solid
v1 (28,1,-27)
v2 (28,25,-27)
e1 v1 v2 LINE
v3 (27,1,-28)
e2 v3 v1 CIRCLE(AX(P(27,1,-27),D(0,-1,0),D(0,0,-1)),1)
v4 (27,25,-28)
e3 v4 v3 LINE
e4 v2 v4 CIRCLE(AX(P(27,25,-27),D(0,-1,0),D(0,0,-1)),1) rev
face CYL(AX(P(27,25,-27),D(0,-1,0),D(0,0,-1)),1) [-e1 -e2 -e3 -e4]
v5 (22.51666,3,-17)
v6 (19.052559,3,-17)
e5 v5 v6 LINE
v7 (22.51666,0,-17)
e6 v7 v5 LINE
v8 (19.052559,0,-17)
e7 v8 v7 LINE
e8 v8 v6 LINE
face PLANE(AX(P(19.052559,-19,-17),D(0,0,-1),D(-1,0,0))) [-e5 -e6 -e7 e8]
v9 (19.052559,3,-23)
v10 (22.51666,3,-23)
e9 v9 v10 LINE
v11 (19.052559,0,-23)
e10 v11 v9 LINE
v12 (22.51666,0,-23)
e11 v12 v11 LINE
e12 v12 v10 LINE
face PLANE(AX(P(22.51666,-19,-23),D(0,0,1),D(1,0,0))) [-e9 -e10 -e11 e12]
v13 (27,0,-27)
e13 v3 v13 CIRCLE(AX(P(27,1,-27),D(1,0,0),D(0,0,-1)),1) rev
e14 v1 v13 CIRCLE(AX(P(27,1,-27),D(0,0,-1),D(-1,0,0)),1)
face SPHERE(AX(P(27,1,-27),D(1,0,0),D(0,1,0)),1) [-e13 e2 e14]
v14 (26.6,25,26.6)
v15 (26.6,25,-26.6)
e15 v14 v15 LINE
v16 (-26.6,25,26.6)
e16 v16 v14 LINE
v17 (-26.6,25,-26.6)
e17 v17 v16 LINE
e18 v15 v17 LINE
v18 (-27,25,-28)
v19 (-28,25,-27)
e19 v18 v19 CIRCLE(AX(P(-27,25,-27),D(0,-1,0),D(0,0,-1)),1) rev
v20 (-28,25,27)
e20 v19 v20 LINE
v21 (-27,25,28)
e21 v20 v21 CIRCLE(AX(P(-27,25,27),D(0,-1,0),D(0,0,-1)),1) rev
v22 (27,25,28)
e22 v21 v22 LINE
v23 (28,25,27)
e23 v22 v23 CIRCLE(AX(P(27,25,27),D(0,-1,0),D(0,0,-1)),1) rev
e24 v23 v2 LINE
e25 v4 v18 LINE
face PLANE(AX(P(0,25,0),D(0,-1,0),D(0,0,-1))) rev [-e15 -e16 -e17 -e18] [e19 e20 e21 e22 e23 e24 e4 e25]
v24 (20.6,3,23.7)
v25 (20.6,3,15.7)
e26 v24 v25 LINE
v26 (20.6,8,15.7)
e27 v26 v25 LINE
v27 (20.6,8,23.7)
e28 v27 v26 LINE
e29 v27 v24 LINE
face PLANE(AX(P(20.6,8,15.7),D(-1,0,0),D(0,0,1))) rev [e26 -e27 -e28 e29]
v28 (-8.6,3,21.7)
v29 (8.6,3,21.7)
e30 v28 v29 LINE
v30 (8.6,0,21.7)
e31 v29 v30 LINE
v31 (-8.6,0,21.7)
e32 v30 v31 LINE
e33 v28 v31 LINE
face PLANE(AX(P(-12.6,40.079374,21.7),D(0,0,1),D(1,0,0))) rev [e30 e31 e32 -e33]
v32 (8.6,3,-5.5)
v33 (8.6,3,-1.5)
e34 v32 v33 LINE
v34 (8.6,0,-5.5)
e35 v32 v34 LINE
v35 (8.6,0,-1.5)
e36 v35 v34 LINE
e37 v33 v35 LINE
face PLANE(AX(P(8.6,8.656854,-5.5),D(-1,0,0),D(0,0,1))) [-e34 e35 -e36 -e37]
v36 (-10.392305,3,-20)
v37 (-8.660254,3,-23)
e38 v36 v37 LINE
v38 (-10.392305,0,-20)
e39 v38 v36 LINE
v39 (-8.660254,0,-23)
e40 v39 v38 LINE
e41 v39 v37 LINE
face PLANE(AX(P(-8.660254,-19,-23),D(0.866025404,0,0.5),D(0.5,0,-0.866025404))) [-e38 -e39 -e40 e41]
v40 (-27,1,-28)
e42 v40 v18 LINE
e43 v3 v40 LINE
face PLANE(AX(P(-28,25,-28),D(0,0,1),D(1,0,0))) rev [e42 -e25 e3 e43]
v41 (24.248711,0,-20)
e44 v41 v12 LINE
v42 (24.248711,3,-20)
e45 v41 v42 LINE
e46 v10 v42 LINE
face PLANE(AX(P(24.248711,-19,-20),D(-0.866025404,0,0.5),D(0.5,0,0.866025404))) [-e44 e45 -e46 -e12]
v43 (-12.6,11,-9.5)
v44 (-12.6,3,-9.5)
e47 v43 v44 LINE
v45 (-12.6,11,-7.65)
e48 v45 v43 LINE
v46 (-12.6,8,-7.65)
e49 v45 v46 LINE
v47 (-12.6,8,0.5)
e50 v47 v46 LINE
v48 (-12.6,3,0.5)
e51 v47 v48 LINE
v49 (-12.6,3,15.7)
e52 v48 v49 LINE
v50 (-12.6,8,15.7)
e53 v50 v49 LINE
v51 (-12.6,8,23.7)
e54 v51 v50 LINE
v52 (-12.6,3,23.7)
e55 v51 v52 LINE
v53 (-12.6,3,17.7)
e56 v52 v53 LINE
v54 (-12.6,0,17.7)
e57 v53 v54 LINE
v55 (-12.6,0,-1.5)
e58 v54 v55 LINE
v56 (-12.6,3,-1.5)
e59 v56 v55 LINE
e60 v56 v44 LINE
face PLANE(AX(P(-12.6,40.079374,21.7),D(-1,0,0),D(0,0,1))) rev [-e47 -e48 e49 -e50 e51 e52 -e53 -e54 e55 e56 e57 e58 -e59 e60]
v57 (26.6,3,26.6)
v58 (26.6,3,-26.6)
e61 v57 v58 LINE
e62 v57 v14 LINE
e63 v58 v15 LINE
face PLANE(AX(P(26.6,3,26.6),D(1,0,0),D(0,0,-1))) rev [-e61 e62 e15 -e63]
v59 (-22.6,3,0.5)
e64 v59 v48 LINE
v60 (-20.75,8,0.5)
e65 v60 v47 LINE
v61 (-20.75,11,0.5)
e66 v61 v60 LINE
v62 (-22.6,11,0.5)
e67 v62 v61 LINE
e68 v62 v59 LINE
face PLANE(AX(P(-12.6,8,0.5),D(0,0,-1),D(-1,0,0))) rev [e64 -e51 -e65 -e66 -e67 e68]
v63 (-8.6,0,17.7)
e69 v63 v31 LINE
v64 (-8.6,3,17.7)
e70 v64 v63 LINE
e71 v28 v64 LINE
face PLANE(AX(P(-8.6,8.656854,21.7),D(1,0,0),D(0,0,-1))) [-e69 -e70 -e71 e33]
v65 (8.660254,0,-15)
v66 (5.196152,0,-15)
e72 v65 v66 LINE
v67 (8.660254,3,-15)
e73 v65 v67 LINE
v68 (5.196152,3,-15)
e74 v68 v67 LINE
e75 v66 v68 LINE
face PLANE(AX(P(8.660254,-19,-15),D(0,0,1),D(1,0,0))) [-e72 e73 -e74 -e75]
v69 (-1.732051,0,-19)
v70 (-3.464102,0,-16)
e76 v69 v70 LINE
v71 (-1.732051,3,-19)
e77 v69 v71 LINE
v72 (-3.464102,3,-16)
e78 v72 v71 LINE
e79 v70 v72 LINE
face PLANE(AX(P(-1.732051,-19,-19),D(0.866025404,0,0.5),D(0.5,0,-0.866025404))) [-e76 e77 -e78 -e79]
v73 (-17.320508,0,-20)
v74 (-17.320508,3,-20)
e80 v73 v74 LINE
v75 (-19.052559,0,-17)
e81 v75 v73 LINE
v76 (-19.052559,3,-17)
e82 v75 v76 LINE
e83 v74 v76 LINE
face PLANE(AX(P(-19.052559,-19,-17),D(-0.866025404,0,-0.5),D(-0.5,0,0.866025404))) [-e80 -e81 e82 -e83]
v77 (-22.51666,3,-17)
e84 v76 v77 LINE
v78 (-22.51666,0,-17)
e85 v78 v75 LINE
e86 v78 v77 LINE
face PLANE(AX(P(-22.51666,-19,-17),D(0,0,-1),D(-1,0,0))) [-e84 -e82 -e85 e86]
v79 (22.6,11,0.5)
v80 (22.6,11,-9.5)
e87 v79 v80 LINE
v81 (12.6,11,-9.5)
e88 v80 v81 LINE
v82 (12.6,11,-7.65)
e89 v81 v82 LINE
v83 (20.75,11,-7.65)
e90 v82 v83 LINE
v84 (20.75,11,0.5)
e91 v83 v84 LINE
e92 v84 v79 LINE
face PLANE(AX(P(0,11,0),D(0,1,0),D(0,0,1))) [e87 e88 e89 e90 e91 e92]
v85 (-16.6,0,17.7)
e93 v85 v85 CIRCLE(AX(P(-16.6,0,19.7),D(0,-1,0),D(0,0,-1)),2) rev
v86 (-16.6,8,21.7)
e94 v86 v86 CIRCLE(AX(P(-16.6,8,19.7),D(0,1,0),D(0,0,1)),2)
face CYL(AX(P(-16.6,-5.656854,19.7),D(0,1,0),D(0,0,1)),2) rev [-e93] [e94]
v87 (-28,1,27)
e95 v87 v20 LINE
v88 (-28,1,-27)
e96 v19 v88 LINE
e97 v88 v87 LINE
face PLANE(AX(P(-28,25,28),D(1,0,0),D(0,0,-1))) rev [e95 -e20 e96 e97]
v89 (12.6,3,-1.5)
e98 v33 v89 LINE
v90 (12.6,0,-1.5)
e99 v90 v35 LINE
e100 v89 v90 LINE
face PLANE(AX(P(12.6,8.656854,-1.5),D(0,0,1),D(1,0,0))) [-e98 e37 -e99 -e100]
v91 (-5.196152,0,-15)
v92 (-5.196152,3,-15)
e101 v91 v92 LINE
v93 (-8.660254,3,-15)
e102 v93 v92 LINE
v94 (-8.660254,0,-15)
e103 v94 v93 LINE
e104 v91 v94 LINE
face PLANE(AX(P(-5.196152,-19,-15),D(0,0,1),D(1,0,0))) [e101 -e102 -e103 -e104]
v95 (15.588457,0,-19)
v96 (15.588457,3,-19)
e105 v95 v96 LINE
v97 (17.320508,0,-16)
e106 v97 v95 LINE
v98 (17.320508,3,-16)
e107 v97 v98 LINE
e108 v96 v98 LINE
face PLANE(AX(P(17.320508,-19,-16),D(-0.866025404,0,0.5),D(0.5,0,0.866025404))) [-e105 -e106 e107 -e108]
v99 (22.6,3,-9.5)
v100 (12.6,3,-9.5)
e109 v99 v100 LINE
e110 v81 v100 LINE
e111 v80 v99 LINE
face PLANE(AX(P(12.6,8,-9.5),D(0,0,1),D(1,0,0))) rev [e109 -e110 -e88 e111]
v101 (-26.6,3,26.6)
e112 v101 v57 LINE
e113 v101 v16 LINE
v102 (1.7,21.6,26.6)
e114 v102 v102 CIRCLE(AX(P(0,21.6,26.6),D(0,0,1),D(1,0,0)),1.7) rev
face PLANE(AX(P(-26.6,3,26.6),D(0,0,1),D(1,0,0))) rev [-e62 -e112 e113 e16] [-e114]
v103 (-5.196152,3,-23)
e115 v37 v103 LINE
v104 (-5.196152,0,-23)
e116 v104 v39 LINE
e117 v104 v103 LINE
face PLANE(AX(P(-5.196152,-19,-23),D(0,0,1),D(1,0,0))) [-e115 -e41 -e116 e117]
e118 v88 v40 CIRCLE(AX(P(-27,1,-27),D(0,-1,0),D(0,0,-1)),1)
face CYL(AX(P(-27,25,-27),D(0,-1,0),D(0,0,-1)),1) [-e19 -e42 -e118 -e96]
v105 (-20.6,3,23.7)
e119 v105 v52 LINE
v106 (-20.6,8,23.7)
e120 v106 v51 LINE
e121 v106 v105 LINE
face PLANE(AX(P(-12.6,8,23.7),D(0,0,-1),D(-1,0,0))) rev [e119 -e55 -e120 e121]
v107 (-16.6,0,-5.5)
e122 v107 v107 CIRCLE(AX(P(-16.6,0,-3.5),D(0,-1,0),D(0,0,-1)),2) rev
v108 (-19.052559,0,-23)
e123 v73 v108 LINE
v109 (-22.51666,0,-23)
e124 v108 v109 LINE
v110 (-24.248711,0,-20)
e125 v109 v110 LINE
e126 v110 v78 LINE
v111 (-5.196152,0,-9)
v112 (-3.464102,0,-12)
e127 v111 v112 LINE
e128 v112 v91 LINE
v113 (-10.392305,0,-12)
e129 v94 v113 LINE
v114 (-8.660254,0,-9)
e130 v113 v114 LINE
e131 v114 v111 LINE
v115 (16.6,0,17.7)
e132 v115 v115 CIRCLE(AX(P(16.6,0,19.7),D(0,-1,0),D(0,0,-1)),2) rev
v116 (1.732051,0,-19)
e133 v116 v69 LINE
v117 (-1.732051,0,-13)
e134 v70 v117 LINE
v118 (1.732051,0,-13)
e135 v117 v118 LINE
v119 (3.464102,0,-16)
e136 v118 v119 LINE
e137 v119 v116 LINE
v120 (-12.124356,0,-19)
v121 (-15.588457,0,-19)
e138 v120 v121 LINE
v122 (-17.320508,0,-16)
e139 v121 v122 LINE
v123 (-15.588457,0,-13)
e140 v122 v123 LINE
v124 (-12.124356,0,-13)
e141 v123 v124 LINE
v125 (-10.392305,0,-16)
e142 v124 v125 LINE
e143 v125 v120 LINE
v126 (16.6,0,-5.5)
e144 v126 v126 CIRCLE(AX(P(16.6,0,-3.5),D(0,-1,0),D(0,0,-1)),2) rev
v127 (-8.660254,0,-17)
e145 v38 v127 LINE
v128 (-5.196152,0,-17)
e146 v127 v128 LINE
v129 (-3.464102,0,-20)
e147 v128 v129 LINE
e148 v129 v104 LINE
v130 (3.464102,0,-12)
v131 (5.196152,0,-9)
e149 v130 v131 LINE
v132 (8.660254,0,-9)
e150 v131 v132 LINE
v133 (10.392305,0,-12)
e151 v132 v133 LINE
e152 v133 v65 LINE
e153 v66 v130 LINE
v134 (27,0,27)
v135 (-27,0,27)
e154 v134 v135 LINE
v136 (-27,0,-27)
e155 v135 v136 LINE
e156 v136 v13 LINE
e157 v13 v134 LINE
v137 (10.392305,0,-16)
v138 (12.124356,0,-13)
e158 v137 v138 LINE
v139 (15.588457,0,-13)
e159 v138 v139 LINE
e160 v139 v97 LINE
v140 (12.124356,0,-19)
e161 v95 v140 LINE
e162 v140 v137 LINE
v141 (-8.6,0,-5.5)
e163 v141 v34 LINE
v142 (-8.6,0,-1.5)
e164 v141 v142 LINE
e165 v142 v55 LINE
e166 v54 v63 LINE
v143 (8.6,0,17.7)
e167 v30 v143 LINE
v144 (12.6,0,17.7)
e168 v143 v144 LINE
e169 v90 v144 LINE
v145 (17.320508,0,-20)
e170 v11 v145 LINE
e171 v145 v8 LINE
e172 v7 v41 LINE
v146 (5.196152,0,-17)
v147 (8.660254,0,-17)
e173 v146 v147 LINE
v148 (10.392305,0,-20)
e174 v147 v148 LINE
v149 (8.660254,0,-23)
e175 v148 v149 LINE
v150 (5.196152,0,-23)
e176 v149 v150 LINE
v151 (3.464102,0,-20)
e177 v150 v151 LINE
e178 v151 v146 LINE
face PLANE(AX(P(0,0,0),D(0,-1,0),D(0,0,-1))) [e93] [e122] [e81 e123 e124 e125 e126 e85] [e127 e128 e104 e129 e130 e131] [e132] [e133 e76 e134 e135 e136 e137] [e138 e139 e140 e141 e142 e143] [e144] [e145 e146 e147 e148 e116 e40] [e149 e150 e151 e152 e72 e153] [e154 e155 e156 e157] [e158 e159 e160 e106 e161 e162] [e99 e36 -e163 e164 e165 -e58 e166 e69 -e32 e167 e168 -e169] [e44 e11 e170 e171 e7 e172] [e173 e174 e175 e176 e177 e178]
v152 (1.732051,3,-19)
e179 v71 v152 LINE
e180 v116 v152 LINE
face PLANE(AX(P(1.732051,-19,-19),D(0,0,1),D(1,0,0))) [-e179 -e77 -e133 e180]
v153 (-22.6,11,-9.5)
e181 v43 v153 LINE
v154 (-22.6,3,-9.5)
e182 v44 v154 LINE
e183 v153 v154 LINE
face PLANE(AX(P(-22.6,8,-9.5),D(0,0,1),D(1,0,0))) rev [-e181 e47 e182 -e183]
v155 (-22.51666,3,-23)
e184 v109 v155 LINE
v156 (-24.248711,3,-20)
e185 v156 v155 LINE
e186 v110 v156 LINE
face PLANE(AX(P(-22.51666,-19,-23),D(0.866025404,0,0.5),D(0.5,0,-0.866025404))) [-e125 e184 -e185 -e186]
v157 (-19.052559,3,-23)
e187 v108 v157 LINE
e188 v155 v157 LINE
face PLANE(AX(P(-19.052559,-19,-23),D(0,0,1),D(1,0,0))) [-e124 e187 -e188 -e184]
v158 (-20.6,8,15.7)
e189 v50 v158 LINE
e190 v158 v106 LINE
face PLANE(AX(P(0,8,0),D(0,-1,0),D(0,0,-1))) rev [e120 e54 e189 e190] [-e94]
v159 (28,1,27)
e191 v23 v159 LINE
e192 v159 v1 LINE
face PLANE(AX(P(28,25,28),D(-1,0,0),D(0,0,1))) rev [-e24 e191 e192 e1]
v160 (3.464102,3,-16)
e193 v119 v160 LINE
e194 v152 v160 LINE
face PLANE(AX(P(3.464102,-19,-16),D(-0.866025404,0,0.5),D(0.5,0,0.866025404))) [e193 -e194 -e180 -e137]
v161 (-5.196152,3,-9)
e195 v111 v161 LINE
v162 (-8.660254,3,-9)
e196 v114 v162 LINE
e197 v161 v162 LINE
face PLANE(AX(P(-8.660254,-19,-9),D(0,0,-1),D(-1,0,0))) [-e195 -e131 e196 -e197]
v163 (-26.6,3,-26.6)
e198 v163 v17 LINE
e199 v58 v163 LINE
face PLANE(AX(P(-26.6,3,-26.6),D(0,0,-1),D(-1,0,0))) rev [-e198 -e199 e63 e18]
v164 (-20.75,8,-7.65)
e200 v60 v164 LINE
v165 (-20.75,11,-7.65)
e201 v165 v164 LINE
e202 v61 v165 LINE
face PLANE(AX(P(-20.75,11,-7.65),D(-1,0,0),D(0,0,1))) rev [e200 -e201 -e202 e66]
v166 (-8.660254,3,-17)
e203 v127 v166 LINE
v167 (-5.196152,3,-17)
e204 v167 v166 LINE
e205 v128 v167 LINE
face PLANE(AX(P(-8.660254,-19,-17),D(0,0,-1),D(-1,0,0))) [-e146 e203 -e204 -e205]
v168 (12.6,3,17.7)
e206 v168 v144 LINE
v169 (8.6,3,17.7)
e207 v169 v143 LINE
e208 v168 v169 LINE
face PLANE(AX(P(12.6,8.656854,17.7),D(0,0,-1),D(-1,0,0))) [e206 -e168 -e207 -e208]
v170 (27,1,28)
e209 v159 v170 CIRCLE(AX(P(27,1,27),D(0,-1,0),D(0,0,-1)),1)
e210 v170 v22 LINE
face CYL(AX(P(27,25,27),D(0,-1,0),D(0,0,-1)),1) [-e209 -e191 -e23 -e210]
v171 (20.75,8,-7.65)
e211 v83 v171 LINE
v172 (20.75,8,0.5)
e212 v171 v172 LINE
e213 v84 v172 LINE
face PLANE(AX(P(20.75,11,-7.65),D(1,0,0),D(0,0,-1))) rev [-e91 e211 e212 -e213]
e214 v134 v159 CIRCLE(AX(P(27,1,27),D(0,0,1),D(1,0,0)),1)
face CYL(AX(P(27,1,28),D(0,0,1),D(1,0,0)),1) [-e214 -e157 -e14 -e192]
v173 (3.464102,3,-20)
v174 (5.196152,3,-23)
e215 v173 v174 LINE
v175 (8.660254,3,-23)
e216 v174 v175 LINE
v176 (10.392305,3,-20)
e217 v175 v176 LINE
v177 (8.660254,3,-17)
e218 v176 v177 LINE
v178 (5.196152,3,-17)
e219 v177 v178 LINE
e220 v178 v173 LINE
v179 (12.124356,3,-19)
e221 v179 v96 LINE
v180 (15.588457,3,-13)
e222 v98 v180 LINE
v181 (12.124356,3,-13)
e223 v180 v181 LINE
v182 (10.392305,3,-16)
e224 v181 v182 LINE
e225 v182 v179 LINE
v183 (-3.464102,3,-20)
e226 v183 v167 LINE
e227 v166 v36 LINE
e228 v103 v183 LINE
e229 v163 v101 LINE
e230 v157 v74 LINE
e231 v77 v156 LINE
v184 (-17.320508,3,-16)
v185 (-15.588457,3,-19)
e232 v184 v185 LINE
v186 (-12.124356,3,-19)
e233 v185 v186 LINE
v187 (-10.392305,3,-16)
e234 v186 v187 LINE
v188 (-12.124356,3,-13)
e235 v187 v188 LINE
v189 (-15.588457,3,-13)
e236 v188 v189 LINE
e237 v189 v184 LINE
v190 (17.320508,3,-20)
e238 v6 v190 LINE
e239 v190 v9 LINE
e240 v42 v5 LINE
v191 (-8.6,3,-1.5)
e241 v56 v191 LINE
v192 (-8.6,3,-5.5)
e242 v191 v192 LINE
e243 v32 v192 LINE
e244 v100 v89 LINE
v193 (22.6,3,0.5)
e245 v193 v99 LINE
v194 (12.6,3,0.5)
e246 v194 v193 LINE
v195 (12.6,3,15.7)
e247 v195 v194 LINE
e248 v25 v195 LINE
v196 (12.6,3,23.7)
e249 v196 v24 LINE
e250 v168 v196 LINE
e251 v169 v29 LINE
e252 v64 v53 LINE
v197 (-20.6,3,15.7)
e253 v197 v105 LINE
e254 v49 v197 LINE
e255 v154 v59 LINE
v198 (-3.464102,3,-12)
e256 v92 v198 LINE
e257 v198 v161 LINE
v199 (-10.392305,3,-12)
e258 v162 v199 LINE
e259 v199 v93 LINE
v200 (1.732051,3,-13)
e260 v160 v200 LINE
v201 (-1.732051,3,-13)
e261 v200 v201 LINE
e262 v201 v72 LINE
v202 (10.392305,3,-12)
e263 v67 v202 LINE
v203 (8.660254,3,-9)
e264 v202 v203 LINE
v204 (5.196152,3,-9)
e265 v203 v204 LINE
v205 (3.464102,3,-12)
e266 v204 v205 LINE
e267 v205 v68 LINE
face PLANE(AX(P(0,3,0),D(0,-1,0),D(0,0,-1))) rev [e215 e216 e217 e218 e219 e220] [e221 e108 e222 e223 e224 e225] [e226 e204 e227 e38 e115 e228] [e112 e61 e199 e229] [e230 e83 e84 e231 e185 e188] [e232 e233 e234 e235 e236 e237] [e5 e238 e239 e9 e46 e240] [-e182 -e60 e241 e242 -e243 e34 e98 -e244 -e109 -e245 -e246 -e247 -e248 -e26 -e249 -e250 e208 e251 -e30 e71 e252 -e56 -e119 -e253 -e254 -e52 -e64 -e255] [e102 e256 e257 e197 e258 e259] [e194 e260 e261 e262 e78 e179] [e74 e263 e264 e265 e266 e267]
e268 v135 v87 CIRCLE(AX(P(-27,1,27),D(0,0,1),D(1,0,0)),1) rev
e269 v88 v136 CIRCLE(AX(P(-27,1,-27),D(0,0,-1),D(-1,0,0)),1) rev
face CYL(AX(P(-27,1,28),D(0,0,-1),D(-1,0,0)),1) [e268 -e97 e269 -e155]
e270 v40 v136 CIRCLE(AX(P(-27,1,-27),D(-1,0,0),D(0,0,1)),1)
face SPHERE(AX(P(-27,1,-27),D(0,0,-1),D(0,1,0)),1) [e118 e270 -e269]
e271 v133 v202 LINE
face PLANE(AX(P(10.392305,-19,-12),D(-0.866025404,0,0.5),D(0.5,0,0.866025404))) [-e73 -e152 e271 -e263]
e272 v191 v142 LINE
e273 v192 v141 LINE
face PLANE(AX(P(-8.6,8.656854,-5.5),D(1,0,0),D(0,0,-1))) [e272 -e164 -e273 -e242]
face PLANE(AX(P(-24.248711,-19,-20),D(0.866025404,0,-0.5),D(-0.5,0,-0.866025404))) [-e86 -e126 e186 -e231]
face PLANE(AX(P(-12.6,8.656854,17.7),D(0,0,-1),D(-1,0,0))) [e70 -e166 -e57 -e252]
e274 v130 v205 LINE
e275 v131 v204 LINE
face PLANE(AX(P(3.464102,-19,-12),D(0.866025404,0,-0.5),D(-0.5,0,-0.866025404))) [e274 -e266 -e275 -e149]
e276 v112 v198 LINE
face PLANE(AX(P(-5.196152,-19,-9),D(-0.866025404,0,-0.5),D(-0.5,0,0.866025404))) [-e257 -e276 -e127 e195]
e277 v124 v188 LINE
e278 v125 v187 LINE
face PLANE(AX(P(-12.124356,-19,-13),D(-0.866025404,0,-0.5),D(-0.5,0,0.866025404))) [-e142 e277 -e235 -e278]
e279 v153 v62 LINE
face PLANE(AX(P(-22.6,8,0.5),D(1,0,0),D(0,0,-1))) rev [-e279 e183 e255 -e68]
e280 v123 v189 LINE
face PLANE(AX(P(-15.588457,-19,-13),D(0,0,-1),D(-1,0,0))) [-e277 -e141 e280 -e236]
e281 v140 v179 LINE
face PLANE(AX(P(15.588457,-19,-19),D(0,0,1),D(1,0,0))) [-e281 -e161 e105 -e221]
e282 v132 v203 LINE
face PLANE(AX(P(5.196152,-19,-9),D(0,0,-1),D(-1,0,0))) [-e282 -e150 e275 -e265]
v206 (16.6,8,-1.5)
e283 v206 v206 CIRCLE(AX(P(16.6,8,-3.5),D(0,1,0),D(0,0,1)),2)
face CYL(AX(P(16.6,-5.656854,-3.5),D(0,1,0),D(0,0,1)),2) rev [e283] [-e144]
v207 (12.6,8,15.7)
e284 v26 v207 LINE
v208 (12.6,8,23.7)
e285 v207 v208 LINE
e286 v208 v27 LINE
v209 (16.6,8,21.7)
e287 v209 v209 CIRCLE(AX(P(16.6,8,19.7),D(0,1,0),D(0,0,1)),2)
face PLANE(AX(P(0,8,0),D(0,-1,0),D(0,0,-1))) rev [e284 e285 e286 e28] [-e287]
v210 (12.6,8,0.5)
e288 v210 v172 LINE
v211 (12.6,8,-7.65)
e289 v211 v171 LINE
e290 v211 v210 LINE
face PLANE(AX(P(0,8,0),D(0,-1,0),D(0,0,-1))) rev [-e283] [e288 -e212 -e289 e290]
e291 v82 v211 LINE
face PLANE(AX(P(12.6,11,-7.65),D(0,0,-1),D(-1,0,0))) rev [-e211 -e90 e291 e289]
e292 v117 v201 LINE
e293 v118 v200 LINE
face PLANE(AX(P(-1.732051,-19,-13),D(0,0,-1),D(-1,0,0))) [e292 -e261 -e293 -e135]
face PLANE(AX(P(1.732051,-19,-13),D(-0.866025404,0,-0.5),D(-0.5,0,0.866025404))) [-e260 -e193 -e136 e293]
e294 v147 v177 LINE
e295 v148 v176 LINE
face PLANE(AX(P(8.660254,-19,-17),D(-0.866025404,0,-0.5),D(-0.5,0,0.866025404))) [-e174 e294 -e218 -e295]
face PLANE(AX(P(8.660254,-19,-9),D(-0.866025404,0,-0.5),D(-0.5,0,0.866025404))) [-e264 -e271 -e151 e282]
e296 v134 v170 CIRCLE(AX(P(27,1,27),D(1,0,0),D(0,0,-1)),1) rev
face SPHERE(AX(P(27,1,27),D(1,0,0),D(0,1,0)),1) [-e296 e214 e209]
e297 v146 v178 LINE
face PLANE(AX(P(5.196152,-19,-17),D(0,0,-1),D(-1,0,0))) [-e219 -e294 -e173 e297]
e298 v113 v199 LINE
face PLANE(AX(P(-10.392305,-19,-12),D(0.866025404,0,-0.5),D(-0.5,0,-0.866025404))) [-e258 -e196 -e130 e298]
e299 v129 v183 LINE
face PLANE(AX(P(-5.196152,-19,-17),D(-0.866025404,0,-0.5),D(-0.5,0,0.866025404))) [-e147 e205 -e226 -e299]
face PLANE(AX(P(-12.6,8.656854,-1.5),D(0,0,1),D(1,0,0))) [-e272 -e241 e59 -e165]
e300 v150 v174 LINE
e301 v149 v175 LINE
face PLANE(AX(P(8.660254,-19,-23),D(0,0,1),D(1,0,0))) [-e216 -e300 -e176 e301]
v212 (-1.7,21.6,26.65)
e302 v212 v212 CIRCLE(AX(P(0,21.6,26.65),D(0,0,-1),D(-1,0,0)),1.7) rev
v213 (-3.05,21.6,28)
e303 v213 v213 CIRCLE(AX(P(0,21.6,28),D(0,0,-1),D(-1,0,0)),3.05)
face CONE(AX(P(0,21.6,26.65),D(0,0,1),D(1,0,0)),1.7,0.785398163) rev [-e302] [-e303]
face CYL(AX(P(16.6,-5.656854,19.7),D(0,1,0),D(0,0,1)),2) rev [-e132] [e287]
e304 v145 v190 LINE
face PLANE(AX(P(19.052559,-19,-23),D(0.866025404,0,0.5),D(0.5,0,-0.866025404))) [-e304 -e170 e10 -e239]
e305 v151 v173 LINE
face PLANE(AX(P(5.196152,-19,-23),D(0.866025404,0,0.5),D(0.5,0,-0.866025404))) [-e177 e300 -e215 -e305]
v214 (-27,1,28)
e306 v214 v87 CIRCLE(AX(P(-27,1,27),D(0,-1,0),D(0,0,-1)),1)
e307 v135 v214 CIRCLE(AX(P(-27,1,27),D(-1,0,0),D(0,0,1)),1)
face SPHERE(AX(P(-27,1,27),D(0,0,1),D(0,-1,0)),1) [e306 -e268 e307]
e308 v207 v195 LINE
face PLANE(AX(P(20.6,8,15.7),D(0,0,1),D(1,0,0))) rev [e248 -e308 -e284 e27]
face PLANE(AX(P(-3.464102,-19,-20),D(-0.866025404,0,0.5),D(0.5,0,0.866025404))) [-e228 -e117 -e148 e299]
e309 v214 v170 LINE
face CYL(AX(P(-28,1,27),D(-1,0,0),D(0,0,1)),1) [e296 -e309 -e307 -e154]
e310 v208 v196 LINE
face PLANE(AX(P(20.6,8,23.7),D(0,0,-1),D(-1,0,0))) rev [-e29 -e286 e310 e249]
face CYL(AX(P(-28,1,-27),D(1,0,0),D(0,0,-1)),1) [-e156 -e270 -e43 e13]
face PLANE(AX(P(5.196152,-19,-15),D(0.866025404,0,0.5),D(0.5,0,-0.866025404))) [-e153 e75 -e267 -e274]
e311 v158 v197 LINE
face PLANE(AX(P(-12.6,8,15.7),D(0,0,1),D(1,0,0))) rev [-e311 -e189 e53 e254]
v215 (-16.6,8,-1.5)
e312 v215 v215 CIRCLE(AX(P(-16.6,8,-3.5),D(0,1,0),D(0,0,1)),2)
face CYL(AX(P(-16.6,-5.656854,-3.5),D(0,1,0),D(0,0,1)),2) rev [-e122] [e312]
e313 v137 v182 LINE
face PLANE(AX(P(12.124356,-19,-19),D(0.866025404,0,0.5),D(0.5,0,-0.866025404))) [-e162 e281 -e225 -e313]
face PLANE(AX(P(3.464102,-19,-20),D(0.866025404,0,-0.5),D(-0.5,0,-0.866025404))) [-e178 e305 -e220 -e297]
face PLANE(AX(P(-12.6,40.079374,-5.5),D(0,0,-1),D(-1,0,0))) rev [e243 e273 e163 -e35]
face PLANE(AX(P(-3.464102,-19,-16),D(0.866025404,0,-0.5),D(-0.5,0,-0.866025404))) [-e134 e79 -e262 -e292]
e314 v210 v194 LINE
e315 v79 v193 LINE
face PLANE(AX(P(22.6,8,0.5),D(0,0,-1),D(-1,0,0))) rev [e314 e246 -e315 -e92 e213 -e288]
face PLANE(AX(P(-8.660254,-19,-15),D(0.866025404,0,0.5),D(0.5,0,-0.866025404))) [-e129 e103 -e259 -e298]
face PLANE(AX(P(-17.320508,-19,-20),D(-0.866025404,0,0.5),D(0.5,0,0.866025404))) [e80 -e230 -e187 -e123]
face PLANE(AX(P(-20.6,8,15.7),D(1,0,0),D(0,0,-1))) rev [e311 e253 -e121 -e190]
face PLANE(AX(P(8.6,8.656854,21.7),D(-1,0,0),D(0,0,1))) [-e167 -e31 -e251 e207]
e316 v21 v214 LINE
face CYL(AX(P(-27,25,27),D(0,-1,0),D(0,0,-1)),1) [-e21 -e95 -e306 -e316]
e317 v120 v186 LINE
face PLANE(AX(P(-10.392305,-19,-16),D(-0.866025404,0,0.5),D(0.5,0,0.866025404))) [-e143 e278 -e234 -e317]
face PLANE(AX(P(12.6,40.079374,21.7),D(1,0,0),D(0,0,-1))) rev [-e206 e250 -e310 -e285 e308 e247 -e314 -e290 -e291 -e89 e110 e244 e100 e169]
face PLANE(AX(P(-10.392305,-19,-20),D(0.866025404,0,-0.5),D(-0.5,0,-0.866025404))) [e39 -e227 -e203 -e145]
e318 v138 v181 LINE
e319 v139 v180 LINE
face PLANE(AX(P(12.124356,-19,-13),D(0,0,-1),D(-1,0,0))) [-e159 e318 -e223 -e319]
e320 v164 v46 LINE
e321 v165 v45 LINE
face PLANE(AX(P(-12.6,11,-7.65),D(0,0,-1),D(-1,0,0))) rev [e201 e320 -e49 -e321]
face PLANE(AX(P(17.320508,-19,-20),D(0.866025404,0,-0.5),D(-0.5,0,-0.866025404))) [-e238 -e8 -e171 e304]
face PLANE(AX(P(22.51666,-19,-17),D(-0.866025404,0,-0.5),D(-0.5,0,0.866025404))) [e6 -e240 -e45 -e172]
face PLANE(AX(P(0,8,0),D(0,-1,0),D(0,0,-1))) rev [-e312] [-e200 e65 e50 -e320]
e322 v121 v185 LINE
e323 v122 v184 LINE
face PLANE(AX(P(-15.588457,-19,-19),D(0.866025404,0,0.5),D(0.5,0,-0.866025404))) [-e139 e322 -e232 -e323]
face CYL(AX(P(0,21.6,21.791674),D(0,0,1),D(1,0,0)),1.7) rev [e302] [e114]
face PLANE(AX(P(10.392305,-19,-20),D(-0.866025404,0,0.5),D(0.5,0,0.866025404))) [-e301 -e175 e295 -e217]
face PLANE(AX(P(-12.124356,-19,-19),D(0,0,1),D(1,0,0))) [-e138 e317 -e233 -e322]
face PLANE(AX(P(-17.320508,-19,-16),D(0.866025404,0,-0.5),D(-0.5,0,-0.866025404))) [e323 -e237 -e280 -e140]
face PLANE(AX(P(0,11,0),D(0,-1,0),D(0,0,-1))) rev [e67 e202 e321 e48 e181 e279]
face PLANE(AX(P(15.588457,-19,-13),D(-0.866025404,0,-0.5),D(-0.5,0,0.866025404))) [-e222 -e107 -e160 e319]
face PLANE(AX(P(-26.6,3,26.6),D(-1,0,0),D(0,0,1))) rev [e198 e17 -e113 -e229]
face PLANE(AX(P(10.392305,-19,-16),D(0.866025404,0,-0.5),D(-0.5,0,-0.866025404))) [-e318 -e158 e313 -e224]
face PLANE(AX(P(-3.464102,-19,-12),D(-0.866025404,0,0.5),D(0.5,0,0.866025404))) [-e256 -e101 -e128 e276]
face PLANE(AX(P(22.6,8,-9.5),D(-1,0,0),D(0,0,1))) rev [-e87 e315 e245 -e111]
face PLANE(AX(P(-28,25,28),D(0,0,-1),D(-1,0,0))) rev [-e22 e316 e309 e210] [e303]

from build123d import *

# Parameters (mm, degrees)
SKETCH1_W           = 56
SKETCH1_H           = 56
BOSS_EXTRUDE1_DEPTH = 25
SKETCH2_W           = 53.2
SKETCH2_H           = 53.2
CUT_EXTRUDE1_DEPTH  = 22
SKETCH3_R           = 1.7
CUT_EXTRUDE2_DEPTH  = 1.4
SKETCH4_W           = 25.2
SKETCH4_H           = 27.2
CUT_EXTRUDE3_DEPTH  = 3
SKETCH5_W           = 4
SKETCH5_H           = 4
BOSS_EXTRUDE2_DEPTH = 3
SKETCH6_W           = 8
SKETCH6_H           = 8
BOSS_EXTRUDE3_DEPTH = 5
SKETCH7_R           = 2
CUT_EXTRUDE4_DEPTH  = 8
BOSS_EXTRUDE4_DEPTH = 3
FILLET1_R           = 1
CHAMFER1_SIZE       = 1.35
FILL_PATTERN1_DEPTH = 3


# Read off the part's stored shape, not the designer's step: Fill Pattern1
with BuildPart() as part:
    # Sketch1 → Boss-Extrude1 (new body)
    with BuildSketch(Plane(origin=(0, 0, 0), x_dir=(1, 0, 0), z_dir=(0, 1, 0))):
        Rectangle(SKETCH1_W, SKETCH1_H)
    extrude(amount=BOSS_EXTRUDE1_DEPTH)

    # Sketch2 → Cut-Extrude1 (cut)
    with BuildSketch(Plane(origin=(0, 25, 0), x_dir=(1, 0, 0), z_dir=(0, 1, 0))):
        Rectangle(SKETCH2_W, SKETCH2_H)
    extrude(amount=-CUT_EXTRUDE1_DEPTH, mode=Mode.SUBTRACT)

    # Sketch3 → Cut-Extrude2 (cut)
    with BuildSketch(Plane.XY.offset(28)):
        with Locations((0, 21.6)):
            Circle(SKETCH3_R)
    extrude(amount=-CUT_EXTRUDE2_DEPTH, mode=Mode.SUBTRACT)

    # Sketch4 → Cut-Extrude3 (cut)
    with BuildSketch(Plane.XZ):
        with Locations((0, 8.1)):
            Rectangle(SKETCH4_W, SKETCH4_H)
    extrude(amount=-CUT_EXTRUDE3_DEPTH, mode=Mode.SUBTRACT)

    # Sketch5 → Boss-Extrude2 (add)
    with BuildSketch(Plane.XZ):
        with Locations((-10.6, 19.7)):
            Rectangle(SKETCH5_W, SKETCH5_H)
        with Locations((10.6, 19.7)):
            Rectangle(SKETCH5_W, SKETCH5_H)
        with Locations((10.6, -3.5)):
            Rectangle(SKETCH5_W, SKETCH5_H)
        with Locations((-10.6, -3.5)):
            Rectangle(SKETCH5_W, SKETCH5_H)
    extrude(amount=-BOSS_EXTRUDE2_DEPTH)

    # Sketch6 → Boss-Extrude3 (add)
    with BuildSketch(Plane(origin=(0, 3, 0), x_dir=(1, 0, 0), z_dir=(0, 1, 0))):
        with Locations((16.6, -19.7)):
            Rectangle(SKETCH6_W, SKETCH6_H)
        with Locations((-16.6, -19.7)):
            Rectangle(SKETCH6_W, SKETCH6_H)
        Polygon((12.6, -0.5), (20.6, -0.5), (22.6, -0.5), (22.6, 9.5), (12.6, 9.5), (12.6, 7.5), align=None)
        Polygon((-12.6, -0.5), (-20.6, -0.5), (-22.6, -0.5), (-22.6, 9.5), (-12.6, 9.5), (-12.6, 7.5), align=None)
    extrude(amount=BOSS_EXTRUDE3_DEPTH)

    # Sketch7 → Cut-Extrude4 (cut)
    with BuildSketch(Plane(origin=(0, 8, 0), x_dir=(1, 0, 0), z_dir=(0, 1, 0))):
        with Locations(Location((16.6, -19.7, 0), (0, 0, 270))):
            Circle(SKETCH7_R)
        with Locations(Location((-16.6, -19.7, 0), (0, 0, 270))):
            Circle(SKETCH7_R)
        with Locations(Location((16.6, 3.5, 0), (0, 0, 270))):
            Circle(SKETCH7_R)
        with Locations(Location((-16.6, 3.5, 0), (0, 0, 270))):
            Circle(SKETCH7_R)
    extrude(amount=-CUT_EXTRUDE4_DEPTH, mode=Mode.SUBTRACT)

    # Sketch9 → Boss-Extrude4 (add)
    with BuildSketch(Plane(origin=(0, 8, 0), x_dir=(1, 0, 0), z_dir=(0, 1, 0))):
        Polygon((-22.6, -0.5), (-22.6, 9.5), (-12.6, 9.5), (-12.6, 7.65), (-20.75, 7.65), (-20.75, -0.5), align=None)
        Polygon((12.6, 9.5), (22.6, 9.5), (22.6, -0.5), (20.75, -0.5), (20.75, 7.65), (12.6, 7.65), align=None)
    extrude(amount=BOSS_EXTRUDE4_DEPTH)

    # Fillet1
    fillet1_edges = [part.edges().sort_by_distance(p)[0] for p in [
        (0, 0, 28),
        (-28, 0, 0),
        (0, 0, -28),
        (28, 0, 0),
        (28, 12.5, 28),
        (-28, 12.5, 28),
        (-28, 12.5, -28),
        (28, 12.5, -28),
    ]]
    fillet(fillet1_edges, radius=FILLET1_R)

    # Chamfer1
    chamfer1_edges = [part.edges().sort_by_distance(p)[0] for p in [
        (-1.7, 21.6, 28),
    ]]
    chamfer(chamfer1_edges, length=CHAMFER1_SIZE)

    # Fill Pattern1 outline → Fill Pattern1 (cut)
    with BuildSketch(Plane(origin=(0, 0, 0), x_dir=(1, 0, 0), z_dir=(0, 1, 0))):
        Polygon((22.516660498, 17), (24.248711306, 20), (22.516660498, 23), (19.052558883, 23), (17.320508076, 20), (19.052558883, 17), align=None)
        Polygon((8.660254038, 23), (5.196152423, 23), (3.464101615, 20), (5.196152423, 17), (8.660254038, 17), (10.392304845, 20), align=None)
        Polygon((-5.196152423, 23), (-8.660254038, 23), (-10.392304845, 20), (-8.660254038, 17), (-5.196152423, 17), (-3.464101615, 20), align=None)
        Polygon((-19.052558883, 23), (-22.516660498, 23), (-24.248711306, 20), (-22.516660498, 17), (-19.052558883, 17), (-17.320508076, 20), align=None)
        Polygon((1.732050808, 13), (3.464101615, 16), (1.732050808, 19), (-1.732050808, 19), (-3.464101615, 16), (-1.732050808, 13), align=None)
        Polygon((-12.124355653, 19), (-15.588457268, 19), (-17.320508076, 16), (-15.588457268, 13), (-12.124355653, 13), (-10.392304845, 16), align=None)
        Polygon((15.588457268, 19), (12.124355653, 19), (10.392304845, 16), (12.124355653, 13), (15.588457268, 13), (17.320508076, 16), align=None)
        Polygon((8.660254038, 9), (10.392304845, 12), (8.660254038, 15), (5.196152423, 15), (3.464101615, 12), (5.196152423, 9), align=None)
        Polygon((-5.196152423, 15), (-8.660254038, 15), (-10.392304845, 12), (-8.660254038, 9), (-5.196152423, 9), (-3.464101615, 12), align=None)
    extrude(amount=FILL_PATTERN1_DEPTH, mode=Mode.SUBTRACT)


solid = part.part
